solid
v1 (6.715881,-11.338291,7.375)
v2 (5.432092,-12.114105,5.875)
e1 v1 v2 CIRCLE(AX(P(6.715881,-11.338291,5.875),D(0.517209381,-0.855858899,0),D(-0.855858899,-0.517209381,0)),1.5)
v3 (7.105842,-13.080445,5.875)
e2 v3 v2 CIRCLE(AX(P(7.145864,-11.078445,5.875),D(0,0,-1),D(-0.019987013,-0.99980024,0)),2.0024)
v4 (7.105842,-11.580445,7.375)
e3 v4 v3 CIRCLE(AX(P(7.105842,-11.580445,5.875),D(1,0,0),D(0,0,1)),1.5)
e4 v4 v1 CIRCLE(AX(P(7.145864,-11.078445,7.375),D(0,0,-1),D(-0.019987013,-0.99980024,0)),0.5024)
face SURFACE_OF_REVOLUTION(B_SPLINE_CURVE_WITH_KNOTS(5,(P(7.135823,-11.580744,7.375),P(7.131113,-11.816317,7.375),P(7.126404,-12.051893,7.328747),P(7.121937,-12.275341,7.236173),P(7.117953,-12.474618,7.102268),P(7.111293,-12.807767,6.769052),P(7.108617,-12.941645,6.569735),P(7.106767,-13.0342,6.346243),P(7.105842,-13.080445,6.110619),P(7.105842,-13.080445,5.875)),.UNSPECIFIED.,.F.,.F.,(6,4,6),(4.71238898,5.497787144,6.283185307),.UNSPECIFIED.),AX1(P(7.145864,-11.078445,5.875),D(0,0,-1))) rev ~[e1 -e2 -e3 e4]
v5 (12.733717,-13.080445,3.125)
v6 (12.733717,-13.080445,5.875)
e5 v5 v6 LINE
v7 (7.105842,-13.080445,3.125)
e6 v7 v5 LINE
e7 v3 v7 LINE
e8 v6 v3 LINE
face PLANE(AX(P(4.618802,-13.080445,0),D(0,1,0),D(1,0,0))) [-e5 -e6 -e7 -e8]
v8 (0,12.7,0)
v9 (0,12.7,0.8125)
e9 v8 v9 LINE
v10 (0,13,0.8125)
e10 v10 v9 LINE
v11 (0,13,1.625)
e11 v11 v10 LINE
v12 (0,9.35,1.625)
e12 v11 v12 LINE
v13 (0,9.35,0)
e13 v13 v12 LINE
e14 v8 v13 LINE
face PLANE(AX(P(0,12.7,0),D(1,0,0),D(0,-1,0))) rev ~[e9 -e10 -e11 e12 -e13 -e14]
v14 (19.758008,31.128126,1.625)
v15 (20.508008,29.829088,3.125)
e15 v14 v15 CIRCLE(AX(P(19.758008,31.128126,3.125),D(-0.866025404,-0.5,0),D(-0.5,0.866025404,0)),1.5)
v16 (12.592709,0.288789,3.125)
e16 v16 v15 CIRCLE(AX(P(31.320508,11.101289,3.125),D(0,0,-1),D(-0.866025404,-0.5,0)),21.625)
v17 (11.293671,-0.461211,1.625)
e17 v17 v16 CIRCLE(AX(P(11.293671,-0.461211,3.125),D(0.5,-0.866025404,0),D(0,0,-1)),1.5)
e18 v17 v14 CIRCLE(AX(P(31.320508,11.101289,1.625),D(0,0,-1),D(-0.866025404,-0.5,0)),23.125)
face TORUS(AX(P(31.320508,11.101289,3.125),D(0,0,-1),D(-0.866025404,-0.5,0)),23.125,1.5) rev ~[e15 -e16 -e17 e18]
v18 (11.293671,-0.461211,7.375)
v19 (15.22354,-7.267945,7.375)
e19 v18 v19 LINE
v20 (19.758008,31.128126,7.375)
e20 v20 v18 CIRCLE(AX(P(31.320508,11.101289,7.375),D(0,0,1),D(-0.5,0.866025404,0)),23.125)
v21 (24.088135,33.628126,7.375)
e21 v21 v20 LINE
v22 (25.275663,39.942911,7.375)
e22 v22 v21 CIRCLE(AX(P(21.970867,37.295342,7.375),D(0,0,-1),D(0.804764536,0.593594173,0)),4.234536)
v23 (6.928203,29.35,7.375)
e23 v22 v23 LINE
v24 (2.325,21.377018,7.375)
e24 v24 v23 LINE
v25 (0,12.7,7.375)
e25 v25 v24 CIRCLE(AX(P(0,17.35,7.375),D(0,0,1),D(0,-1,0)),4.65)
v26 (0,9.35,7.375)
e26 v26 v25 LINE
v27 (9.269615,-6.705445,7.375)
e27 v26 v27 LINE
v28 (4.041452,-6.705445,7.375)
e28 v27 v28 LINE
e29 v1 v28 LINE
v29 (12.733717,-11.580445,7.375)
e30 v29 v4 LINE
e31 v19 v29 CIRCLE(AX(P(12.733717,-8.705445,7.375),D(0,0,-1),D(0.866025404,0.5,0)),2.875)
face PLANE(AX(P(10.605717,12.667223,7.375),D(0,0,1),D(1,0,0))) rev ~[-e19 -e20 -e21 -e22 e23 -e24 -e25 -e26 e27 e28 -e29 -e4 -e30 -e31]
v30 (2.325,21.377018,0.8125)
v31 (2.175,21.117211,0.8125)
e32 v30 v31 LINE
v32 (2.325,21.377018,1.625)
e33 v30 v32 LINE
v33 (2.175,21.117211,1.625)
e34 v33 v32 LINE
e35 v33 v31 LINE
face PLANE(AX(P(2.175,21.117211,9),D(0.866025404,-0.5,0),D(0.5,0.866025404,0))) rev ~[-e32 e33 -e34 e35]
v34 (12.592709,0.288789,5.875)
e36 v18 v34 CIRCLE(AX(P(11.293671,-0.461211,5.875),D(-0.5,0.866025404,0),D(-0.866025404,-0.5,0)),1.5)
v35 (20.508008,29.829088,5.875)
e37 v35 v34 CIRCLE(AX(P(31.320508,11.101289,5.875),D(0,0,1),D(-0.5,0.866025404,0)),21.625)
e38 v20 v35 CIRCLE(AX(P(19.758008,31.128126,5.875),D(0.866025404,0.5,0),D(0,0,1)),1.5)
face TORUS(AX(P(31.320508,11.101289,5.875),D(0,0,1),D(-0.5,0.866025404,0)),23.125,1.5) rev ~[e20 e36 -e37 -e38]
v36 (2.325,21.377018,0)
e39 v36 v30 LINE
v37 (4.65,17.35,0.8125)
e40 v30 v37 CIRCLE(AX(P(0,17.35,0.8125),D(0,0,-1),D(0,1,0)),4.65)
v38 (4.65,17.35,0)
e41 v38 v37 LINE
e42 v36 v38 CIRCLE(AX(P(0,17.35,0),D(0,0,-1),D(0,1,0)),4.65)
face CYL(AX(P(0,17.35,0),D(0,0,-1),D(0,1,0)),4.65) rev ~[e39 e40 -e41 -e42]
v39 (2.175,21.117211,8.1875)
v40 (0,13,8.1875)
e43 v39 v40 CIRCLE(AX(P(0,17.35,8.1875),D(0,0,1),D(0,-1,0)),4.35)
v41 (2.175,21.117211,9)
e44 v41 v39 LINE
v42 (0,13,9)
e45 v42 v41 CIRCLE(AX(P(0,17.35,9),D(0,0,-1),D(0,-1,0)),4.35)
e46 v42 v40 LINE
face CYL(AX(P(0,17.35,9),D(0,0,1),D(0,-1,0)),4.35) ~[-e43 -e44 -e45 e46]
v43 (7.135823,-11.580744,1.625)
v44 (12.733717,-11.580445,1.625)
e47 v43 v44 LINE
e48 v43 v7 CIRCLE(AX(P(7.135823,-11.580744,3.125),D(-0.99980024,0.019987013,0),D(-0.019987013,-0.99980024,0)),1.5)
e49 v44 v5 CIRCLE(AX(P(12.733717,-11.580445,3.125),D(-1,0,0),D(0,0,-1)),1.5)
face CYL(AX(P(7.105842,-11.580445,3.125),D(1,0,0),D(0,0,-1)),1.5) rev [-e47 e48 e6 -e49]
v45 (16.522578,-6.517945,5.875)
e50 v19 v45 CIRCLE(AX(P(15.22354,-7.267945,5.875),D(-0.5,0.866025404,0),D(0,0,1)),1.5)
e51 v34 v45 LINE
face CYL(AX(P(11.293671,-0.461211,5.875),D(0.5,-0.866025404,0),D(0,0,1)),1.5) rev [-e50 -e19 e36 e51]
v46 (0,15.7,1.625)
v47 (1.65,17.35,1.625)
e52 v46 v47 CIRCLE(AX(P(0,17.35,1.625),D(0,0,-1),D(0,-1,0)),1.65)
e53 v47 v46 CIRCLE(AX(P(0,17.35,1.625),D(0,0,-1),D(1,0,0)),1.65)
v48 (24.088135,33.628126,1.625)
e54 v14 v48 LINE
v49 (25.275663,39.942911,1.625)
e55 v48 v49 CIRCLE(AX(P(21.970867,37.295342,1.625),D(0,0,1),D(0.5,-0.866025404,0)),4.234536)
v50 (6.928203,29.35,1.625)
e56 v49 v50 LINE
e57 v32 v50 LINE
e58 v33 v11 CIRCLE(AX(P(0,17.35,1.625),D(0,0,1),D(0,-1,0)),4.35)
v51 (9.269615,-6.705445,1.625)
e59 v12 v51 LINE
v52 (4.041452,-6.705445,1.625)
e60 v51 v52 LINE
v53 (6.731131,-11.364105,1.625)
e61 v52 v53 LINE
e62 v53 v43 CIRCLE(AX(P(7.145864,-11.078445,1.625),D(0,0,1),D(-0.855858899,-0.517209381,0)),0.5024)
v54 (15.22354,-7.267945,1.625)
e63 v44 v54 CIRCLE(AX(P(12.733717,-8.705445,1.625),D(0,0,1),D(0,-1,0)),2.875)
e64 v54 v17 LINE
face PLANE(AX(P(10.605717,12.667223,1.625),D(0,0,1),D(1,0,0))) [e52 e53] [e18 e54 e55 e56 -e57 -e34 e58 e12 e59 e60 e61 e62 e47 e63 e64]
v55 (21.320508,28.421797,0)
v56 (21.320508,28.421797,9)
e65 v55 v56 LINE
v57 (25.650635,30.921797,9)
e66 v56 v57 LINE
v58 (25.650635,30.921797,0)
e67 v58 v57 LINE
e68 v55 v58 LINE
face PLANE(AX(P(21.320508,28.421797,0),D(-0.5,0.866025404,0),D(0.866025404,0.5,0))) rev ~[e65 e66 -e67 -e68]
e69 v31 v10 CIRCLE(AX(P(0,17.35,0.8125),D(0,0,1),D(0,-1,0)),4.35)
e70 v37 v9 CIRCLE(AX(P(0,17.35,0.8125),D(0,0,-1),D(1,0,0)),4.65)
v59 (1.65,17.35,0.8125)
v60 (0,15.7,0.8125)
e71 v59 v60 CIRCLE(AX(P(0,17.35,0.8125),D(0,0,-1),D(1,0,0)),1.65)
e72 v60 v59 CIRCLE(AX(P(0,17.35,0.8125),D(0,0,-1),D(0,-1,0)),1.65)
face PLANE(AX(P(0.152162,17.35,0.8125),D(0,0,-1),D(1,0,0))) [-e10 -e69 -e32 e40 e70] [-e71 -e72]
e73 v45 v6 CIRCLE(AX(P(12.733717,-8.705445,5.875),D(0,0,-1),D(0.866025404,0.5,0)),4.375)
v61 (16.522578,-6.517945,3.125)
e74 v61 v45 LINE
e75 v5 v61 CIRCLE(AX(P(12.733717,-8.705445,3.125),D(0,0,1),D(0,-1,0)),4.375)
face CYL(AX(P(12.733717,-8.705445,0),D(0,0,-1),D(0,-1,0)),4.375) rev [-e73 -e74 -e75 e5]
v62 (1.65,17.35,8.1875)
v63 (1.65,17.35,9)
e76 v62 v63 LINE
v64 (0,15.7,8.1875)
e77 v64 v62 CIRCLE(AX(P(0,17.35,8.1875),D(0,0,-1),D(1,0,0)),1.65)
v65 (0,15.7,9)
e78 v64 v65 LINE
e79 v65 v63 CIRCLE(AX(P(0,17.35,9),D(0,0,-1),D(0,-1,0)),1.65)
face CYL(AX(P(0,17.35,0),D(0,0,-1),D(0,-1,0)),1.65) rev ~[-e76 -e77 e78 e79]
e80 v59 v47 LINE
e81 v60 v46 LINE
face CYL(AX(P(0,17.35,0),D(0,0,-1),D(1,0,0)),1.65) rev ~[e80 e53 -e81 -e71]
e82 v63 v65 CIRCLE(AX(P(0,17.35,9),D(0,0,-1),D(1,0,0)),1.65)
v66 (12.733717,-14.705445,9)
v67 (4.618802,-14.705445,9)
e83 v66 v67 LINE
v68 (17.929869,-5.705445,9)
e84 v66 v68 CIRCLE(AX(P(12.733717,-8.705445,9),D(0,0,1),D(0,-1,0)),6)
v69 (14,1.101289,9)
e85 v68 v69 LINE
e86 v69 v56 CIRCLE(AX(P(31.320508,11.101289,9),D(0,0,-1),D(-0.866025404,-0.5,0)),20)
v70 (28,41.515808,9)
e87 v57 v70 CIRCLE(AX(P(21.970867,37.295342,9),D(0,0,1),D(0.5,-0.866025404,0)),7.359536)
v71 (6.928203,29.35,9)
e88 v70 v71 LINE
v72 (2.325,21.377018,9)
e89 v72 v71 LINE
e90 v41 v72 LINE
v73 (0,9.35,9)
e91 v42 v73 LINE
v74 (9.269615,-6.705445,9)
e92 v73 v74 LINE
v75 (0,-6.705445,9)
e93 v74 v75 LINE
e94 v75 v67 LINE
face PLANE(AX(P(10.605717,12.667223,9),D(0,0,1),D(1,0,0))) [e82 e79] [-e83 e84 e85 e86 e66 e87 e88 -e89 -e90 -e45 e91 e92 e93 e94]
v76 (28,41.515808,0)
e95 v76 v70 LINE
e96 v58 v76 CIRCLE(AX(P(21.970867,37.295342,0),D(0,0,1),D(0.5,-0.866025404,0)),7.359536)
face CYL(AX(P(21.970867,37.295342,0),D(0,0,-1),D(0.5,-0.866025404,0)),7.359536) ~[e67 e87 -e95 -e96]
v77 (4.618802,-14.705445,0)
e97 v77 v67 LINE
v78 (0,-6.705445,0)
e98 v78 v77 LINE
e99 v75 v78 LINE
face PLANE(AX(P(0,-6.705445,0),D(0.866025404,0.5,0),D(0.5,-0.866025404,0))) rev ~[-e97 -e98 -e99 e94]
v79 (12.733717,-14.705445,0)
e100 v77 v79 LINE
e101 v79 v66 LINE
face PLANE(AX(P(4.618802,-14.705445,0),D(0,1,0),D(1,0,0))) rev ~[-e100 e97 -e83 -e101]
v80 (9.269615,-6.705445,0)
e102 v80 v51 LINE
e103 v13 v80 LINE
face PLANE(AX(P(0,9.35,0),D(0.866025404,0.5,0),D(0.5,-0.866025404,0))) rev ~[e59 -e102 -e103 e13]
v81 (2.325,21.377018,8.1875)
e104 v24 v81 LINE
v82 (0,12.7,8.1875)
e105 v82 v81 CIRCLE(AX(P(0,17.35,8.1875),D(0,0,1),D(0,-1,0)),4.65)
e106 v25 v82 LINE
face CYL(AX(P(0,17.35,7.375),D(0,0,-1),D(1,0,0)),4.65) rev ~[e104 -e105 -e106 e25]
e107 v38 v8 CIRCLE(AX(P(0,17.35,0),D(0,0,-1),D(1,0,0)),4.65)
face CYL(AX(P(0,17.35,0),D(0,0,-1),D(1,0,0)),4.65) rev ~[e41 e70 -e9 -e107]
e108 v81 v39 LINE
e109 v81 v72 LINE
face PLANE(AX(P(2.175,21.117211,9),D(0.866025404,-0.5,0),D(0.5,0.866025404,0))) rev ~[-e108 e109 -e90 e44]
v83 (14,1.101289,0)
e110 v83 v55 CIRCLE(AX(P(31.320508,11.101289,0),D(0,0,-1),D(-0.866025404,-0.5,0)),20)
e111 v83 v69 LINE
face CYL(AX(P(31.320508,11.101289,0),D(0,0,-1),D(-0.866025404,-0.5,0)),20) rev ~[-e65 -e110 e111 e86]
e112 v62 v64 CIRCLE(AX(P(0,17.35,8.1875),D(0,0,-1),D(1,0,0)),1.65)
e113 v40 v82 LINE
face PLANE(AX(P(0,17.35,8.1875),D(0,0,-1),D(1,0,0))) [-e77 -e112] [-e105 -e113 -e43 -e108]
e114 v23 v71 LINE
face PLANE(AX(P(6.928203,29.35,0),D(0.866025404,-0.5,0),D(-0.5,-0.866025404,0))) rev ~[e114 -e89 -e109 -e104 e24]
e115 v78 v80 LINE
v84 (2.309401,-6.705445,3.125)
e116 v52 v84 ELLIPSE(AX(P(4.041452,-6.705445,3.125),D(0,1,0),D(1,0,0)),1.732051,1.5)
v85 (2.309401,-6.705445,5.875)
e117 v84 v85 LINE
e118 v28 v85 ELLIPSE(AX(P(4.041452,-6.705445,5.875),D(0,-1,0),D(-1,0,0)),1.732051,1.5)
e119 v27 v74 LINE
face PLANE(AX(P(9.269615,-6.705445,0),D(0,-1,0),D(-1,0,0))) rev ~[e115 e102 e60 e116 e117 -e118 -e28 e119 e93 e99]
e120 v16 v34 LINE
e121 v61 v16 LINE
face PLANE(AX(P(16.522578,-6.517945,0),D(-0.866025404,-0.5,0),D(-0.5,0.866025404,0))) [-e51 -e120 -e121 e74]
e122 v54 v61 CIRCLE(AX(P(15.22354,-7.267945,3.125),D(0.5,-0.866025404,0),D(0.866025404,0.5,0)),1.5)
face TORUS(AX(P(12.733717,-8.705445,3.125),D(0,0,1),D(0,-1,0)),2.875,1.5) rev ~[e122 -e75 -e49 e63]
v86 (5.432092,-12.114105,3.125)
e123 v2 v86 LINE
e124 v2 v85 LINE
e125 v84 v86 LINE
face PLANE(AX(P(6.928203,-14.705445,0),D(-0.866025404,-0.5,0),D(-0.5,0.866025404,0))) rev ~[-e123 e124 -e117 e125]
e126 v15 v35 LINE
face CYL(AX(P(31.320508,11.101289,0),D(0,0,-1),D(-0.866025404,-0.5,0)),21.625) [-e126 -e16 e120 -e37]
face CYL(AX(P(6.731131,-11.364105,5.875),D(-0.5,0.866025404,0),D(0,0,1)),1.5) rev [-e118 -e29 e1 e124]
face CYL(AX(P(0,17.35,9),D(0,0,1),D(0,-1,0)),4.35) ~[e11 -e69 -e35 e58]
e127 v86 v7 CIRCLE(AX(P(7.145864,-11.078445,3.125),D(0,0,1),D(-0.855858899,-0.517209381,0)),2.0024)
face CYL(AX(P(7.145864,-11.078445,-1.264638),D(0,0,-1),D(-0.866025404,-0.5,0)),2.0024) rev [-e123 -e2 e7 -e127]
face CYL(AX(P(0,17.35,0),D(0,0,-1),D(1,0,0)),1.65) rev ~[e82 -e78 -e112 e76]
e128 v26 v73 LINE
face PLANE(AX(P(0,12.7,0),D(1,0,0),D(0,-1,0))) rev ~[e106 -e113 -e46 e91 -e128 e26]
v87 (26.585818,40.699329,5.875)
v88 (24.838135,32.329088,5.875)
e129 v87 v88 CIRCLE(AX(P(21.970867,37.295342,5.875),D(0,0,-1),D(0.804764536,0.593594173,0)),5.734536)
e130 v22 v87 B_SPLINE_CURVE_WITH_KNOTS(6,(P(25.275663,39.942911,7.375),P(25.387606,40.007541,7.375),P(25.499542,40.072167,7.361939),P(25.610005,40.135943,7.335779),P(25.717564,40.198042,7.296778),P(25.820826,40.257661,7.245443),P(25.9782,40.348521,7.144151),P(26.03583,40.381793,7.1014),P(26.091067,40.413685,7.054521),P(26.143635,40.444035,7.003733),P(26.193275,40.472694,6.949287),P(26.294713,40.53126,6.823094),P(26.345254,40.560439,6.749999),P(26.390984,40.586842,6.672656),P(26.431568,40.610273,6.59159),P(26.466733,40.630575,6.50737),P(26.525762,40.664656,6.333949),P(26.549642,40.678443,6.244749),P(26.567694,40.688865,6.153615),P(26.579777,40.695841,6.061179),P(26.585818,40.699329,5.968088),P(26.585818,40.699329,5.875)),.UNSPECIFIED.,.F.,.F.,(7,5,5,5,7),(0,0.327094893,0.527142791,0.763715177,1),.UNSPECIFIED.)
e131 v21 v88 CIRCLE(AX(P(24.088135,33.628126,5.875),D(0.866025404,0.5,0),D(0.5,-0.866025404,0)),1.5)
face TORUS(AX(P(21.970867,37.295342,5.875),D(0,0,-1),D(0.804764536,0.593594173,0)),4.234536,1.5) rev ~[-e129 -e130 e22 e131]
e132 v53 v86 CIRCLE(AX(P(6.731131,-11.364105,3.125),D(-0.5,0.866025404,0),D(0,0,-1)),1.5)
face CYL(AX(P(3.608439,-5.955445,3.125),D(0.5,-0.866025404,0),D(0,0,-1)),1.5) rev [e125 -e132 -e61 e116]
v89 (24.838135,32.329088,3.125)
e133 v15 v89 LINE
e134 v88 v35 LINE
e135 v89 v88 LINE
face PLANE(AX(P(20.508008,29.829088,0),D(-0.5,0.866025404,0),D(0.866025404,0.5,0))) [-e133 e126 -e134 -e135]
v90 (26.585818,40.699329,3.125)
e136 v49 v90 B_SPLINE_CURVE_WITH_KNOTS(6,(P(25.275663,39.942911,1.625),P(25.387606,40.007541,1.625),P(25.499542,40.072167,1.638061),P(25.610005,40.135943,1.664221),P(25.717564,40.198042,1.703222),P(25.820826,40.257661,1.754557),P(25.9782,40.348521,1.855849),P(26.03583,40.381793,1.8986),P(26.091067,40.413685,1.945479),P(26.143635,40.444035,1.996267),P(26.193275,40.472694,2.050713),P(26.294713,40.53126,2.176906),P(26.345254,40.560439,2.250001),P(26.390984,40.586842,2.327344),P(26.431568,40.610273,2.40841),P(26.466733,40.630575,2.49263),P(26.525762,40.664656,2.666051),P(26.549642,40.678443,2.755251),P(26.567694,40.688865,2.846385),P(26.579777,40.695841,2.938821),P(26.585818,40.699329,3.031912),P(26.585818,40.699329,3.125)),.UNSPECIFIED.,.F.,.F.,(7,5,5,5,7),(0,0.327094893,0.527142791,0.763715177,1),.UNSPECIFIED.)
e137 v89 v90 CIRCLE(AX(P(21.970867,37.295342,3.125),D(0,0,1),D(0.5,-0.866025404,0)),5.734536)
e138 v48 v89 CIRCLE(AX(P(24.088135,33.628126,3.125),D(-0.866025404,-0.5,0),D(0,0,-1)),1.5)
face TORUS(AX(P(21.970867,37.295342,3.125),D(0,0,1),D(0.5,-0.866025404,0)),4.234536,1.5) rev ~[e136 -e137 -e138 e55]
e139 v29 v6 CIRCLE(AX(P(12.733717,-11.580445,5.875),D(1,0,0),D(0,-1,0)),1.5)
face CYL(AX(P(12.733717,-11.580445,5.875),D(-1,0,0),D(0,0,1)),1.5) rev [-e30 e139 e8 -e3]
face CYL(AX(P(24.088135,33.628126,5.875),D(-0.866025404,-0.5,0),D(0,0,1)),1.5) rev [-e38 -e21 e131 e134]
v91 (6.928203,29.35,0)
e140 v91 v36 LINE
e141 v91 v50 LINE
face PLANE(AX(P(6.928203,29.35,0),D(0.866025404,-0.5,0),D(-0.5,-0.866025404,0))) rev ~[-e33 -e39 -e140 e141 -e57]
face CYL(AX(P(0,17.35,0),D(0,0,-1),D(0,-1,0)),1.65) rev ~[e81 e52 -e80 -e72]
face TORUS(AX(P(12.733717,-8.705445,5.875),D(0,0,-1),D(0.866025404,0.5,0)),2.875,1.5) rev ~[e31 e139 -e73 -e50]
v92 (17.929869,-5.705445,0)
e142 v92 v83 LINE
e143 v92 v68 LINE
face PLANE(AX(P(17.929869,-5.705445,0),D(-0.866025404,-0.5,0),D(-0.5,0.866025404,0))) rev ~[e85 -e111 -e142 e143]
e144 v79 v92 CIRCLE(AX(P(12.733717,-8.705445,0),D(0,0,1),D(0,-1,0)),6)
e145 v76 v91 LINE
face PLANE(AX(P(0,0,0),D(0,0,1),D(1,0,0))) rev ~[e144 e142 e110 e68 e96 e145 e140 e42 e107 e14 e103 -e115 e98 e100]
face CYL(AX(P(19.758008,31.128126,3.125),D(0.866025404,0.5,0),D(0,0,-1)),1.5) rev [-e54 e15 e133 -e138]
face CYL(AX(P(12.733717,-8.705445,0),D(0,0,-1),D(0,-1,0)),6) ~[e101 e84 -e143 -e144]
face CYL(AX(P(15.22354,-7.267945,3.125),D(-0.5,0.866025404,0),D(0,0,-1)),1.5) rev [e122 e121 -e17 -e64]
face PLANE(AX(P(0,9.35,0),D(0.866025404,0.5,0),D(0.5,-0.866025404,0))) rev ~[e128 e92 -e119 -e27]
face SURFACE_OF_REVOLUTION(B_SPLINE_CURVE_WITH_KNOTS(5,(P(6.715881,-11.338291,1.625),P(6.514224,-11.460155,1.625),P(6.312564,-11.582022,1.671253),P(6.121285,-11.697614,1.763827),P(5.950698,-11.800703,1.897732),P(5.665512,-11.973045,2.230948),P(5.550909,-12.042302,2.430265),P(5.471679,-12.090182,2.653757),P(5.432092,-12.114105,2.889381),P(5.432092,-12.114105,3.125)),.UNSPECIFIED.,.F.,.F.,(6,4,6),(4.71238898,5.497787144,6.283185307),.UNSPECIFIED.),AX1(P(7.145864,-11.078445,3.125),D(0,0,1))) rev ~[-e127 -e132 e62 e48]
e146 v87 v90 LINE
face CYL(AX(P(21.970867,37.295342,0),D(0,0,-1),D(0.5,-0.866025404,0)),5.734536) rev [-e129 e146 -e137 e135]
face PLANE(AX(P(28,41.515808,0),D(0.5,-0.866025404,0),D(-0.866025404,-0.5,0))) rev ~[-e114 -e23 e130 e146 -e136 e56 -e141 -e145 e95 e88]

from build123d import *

# Parameters (mm, degrees)
F1_DEPTH    = 9
F2_T        = -1.625
F3_R        = 4.65
F4_DEPTH    = 5.75
F6_DEPTH    = 9
F7_T4_DEPTH = 11.5292765407
F8_R        = 1.5
F9_R        = 1.5
F11_DEPTH   = 25
F12_R       = 1.65
F13_DEPTH   = 0.8125
F14_R       = 4.65
F14_R_2     = 1.65
F15_DEPTH   = 0.8125
F17_DEPTH   = 25
F19_DEPTH   = 25


# Not quite as in the source:
# - a fillet or chamfer that OpenCascade refuses, or shapes differently, is made with other operations: its cross-section is extruded or revolved along the edge and cut away or added


with BuildPart() as f1:
    # F0 (on Top) → F1 (new body)
    with BuildSketch(Plane.XY):
        with BuildLine():
            Line((-2.2380131875, 10.0346875), (0, 9.35))
            Line((0, 9.35), (9.2696152423, -6.7054445662))
            Line((9.2696152423, -6.7054445662), (0, -6.7054445662))
            Line((0, -6.7054445662), (4.6188021535, -14.7054445662))
            Line((4.6188021535, -14.7054445662), (12.7337168574, -14.7054445662))
            ThreePointArc((12.7337168574, -14.7054445662), (17.9298692801, -11.7054445662), (17.9298692801, -5.7054445662))
            Line((17.9298692801, -5.7054445662), (14, 1.101288694))
            ThreePointArc((14, 1.101288694), (12.0019915499, 16.2776695961), (21.3205080757, 28.4217967697))
            Line((21.3205080757, 28.4217967697), (25.6506350946, 30.9217967697))
            ThreePointArc((25.6506350946, 30.9217967697), (29.1558482852, 35.7019755006), (28, 41.5158075373))
            Line((28, 41.5158075373), (-6.2733497352, 21.7280798417))
            ThreePointArc((-6.2733497352, 21.7280798417), (-7.2315061235, 14.8544401058), (-2.2380131875, 10.0346875))
        make_face()
        with BuildLine():
            ThreePointArc((1.65, 17.35), (1.166726189, 16.183273811), (0, 15.7))
            ThreePointArc((0, 15.7), (-1.166726189, 18.516726189), (1.65, 17.35))
        make_face(mode=Mode.SUBTRACT)
    extrude(amount=F1_DEPTH)

    # F2
    f2_openings = [f1.faces().sort_by_distance(p)[0] for p in [
        (10.863325, 31.621944, 4.5),
        (-7.231506, 14.85444, 4.5),
        (4.634808, 1.322278, 4.5),
        (4.634808, -6.705445, 4.5),
        (2.309401, -10.705445, 4.5),
        (-1.119007, 9.692344, 4.5),
    ]]
    offset(amount=F2_T, openings=f2_openings)

    # F3 (on face) → F4 (cut, through all)
    with BuildSketch(Plane.XY.offset(1.625)):
        with Locations((0, 17.35)):
            Circle(F3_R)
    extrude(amount=F4_DEPTH, mode=Mode.SUBTRACT)

    # F5 (on face) → F6 (join)
    with BuildSketch(Plane.XY):
        Polygon((0, -6.7054445662), (4.6188021535, -14.7054445662), (6.9282032303, -14.7054445662), (2.3094010768, -6.7054445662), align=None)
    extrude(amount=F6_DEPTH)

    # F7: fillet of radius 2 on 2 edges, made by hand


with BuildPart() as f7_tool2:
    # F7_s3 → F7_t4 (new body)
    with BuildSketch(Plane.XY.offset(-1.2646382703)):
        with BuildLine():
            ThreePointArc((5.4117350132, -12.0796445662), (6.1446642818, -12.8125738348), (7.1458642818, -13.0808445662))
            Line((7.1458642818, -13.0808445662), (7.1458642818, -13.2810845662))
            ThreePointArc((7.1458642818, -13.2810845662), (6.5679366623, -13.2806845662), (5.9900090428, -13.2806845662))
            Line((5.9900090428, -13.2806845662), (5.816596116, -13.1805645662))
            ThreePointArc((5.816596116, -13.1805645662), (5.5276323063, -12.6800645662), (5.2383220864, -12.1797645662))
            Line((5.2383220864, -12.1797645662), (5.4117350132, -12.0796445662))
        make_face()
    extrude(amount=F7_T4_DEPTH)

    split(bisect_by=Plane.XY.offset(9), keep=Keep.BOTTOM)

    split(bisect_by=Plane.XY, keep=Keep.TOP)


with BuildPart() as f1_1:
    add(f1.part)

    # F7_t1: union F7_tool2
    add(f7_tool2.part)

    # F8
    f8_edges = [f1_1.edges().sort_by_distance(p)[0] for p in [
        (14.557643, -3.114578, 7.375),
    ]]
    fillet(f8_edges, radius=F8_R)

    # F9
    f9_edges = [f1_1.edges().sort_by_distance(p)[0] for p in [
        (10.432362, 16.698251, 1.625),
        (3.870747, -9.409775, 1.625),
        (27.584345, 36.123263, 1.625),
        (22.673072, 31.079088, 1.625),
        (14.557643, -3.114578, 1.625),
        (16.522578, -10.892945, 1.625),
        (9.91978, -13.080445, 1.625),
        (6.144664, -12.812574, 1.625),
    ]]
    fillet(f9_edges, radius=F9_R)

    # F10 (on face) → F11 (cut)
    with BuildSketch(Plane(origin=(0, 0, 0), x_dir=(1, 0, 0), z_dir=(0, 0, -1))):
        with BuildLine():
            ThreePointArc((0, -22), (-4.65, -17.35), (0, -12.7))
            Line((0, -12.7), (0, -9.35))
            Line((0, -9.35), (-2.2380131875, -10.0346875))
            ThreePointArc((-2.2380131875, -10.0346875), (-7.2315061235, -14.8544401058), (-6.2733497352, -21.7280798417))
            Line((-6.2733497352, -21.7280798417), (0, -25.35))
            Line((0, -25.35), (0, -22))
        make_face()
    extrude(amount=-F11_DEPTH, mode=Mode.SUBTRACT)

    # F12 (on face) → F13 (cut)
    with BuildSketch(Plane(origin=(0, 0, 0), x_dir=(1, 0, 0), z_dir=(0, 0, -1))):
        with BuildLine():
            ThreePointArc((0, -22), (3.2880465325, -20.6380465325), (4.65, -17.35))
            ThreePointArc((4.65, -17.35), (3.2880465325, -14.0619534675), (0, -12.7))
            ThreePointArc((0, -12.7), (-4.65, -17.35), (0, -22))
        make_face()
        with Locations((0, -17.35)):
            Circle(F12_R, mode=Mode.SUBTRACT)
        with Locations((0, -17.35)):
            Circle(F12_R)
    extrude(amount=-F13_DEPTH, mode=Mode.SUBTRACT)

    # F14 (on face) → F15 (cut)
    with BuildSketch(Plane(origin=(0, 0, 7.375), x_dir=(1, 0, 0), z_dir=(0, 0, -1))):
        with Locations((0, -17.35)):
            Circle(F14_R)
        with Locations((0, -17.35)):
            Circle(F14_R_2, mode=Mode.SUBTRACT)
    extrude(amount=-F15_DEPTH, mode=Mode.SUBTRACT)

    # F16 (on face) → F17 (cut)
    with BuildSketch(Plane(origin=(0, 0, 0), x_dir=(1, 0, 0), z_dir=(0, 0, -1))):
        with BuildLine():
            Line((6.9282032303, -29.35), (2.325, -21.3770181276))
            ThreePointArc((2.325, -21.3770181276), (1.2035085597, -21.8415550922), (0, -22))
            Line((0, -22), (0, -25.35))
            Line((0, -25.35), (6.9282032303, -29.35))
        make_face()
    extrude(amount=-F17_DEPTH, mode=Mode.SUBTRACT)

    # F18 (on face) → F19 (cut)
    with BuildSketch(Plane.XY.offset(9)):
        with BuildLine():
            Line((2.175, 21.1172105065), (2.325, 21.3770181276))
            ThreePointArc((2.325, 21.3770181276), (-4.4915550922, 18.5535085597), (0, 12.7))
            Line((0, 12.7), (0, 13))
            ThreePointArc((0, 13), (-4.2017773444, 18.4758628462), (2.175, 21.1172105065))
        make_face()
    extrude(amount=-F19_DEPTH, mode=Mode.SUBTRACT)


solid = f1_1.part
